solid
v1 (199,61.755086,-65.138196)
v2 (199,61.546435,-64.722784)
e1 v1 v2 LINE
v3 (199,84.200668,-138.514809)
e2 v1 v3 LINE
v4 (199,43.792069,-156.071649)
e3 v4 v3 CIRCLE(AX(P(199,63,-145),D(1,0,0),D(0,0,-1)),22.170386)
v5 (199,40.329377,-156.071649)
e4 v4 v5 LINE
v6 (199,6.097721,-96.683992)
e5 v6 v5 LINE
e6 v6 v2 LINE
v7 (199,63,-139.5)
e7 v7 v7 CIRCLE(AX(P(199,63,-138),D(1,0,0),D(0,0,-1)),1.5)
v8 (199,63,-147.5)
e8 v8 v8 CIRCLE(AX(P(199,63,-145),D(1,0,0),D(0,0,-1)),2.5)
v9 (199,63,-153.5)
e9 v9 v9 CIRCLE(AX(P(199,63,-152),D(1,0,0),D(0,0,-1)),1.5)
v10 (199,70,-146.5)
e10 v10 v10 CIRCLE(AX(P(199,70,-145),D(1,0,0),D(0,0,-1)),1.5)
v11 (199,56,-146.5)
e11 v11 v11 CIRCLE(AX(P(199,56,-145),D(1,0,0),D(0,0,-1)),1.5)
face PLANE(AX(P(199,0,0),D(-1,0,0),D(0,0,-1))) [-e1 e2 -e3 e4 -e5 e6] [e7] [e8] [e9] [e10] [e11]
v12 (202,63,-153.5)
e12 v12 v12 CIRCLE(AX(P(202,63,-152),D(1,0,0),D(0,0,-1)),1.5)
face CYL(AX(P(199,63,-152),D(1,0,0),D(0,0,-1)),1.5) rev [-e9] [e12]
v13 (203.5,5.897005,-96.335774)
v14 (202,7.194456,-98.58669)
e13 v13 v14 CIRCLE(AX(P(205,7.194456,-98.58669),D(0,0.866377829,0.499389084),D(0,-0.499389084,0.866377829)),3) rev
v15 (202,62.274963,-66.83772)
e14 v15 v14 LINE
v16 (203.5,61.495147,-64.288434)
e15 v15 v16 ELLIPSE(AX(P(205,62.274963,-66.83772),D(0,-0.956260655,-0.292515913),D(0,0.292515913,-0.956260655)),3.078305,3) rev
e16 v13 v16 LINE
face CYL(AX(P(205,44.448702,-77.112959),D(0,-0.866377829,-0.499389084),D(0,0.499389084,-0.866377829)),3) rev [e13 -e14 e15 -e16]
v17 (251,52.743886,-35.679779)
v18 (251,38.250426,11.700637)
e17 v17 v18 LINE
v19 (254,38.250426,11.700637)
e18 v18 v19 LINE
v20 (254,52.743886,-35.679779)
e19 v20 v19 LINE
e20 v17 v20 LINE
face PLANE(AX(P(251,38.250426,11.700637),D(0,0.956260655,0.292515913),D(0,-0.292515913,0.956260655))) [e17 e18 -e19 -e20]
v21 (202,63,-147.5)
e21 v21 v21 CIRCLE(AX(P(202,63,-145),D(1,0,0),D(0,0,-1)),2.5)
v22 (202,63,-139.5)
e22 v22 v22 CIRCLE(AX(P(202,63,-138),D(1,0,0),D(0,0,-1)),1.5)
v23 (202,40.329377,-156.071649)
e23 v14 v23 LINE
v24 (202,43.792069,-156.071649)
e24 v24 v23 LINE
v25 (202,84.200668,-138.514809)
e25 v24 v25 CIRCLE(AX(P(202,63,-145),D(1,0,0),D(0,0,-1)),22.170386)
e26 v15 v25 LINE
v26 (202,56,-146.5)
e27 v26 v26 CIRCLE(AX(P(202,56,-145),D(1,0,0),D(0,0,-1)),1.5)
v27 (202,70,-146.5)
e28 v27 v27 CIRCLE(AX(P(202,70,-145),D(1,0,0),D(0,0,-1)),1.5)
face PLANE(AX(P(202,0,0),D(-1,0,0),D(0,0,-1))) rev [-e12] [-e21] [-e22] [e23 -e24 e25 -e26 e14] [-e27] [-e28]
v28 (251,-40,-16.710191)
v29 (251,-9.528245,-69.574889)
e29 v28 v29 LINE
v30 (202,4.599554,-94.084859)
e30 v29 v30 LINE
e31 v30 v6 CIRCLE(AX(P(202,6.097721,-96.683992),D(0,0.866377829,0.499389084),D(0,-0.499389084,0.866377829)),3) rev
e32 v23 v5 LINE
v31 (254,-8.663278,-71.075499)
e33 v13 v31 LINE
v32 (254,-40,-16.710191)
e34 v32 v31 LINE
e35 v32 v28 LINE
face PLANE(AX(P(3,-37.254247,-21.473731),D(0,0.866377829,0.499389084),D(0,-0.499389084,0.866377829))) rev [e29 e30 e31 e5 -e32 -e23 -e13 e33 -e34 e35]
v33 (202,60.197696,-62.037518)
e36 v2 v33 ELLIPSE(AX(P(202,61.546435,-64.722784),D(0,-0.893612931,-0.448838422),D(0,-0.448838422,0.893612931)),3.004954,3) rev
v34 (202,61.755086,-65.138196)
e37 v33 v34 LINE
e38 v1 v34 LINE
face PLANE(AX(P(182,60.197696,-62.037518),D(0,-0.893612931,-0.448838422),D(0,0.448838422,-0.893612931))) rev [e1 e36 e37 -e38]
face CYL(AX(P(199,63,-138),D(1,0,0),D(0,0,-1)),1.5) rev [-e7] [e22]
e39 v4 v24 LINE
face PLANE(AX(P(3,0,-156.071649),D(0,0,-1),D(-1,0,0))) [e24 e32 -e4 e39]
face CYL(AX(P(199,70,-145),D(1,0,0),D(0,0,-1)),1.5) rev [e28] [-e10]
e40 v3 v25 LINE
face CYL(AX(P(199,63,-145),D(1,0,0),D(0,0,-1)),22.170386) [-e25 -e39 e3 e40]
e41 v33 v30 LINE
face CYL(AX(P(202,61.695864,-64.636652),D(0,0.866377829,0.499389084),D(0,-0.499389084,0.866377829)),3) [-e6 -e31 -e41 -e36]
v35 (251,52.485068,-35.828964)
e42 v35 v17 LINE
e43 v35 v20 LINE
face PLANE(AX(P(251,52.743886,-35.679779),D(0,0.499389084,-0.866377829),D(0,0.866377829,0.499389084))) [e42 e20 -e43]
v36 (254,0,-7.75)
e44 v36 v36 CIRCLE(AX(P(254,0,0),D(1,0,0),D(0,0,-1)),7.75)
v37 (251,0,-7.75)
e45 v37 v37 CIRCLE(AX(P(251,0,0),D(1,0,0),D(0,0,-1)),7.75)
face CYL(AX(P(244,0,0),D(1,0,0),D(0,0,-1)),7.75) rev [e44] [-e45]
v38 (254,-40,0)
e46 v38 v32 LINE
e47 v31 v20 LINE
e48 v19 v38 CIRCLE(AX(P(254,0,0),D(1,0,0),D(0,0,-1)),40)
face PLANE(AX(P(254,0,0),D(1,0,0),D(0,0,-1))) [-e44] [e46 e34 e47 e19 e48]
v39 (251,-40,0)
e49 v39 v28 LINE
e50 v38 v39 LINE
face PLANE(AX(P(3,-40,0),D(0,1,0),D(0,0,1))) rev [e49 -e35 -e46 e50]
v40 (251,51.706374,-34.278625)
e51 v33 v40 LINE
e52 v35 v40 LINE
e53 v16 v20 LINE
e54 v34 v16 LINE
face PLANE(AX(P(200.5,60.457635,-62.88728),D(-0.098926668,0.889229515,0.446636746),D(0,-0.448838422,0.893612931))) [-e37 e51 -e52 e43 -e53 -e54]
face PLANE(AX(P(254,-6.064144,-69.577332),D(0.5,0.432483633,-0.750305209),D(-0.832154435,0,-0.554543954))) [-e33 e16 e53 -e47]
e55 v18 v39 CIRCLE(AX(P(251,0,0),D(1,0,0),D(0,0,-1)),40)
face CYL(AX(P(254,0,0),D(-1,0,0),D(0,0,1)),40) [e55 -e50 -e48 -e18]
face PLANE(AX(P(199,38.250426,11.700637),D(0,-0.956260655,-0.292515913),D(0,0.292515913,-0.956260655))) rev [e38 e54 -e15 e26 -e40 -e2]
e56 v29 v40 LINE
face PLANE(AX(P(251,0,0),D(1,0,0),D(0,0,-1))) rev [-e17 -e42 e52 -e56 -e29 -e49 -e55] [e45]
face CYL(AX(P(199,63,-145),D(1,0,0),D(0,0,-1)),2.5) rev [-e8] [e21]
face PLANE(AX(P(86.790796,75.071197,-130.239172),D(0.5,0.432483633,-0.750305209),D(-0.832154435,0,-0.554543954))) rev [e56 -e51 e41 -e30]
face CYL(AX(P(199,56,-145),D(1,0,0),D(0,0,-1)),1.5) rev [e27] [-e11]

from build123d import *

# Parameters (mm, degrees)
SKETCH_2_R           = 3
SKETCH_2_R_2         = 1.5
SKETCH_2_R_3         = 2.5
EXTRUDE_1_DEPTH      = 3
EXTRUDE_2_DEPTH      = 196
SKETCH_5_R           = 8
CUT_EXTRUDE_1_DEPTH  = 10
SKETCH_6_R           = 4.05
CUT_EXTRUDE_2_DEPTH  = 10
SKETCH_8_R           = 40
EXTRUDE_3_DEPTH      = 3
EXTRUDE_START        = -61
EXTRUDE_4_DEPTH      = 64
EXTRUDE_5_DEPTH      = 3
EXTRUDE_START_2      = -3
EXTRUDE_14_DEPTH     = 3
EXTRUDE_15_DEPTH     = 3
SKETCH_16_R          = 40
EXTRUDE_16_DEPTH     = 3
CUT_EXTRUDE_START    = -20
CUT_EXTRUDE_5_DEPTH  = 20
CUT_EXTRUDE_6_DEPTH  = 20
CUT_EXTRUDE_7_DEPTH  = 3
FILLET_3_R           = 3
FILLET_4_R           = 3
FILLET_5_R           = 3
FILLET_6_R           = 3
SKETCH_22_R          = 7.75
CUT_EXTRUDE_8_DEPTH  = 10
SKETCH_23_R          = 4.05
CUT_EXTRUDE_9_DEPTH  = 10
CUT_EXTRUDE_10_DEPTH = 10
CUT_EXTRUDE_11_DEPTH = 10
SKETCH_26_W          = 471.047466431
SKETCH_26_H          = 304.479350924
CUT_EXTRUDE_12_DEPTH = 135


# Some blends are built 0.0001 mm under size
with BuildPart() as part:
    # 草图2 → 凸台-拉伸1 (new body)
    with BuildSketch(Plane(origin=(0, 0, 0), x_dir=(0, 0, -1), z_dir=(1, 0, 0))):
        with BuildLine():
            Line((138.514809283, 84.200667909), (-11.70063651, 38.25042621))
            ThreePointArc((-11.70063651, 38.25042621), (-39.560188627, -5.915359313), (0, -40))
            Line((0, -40), (16.710190716, -40))
            Line((16.710190716, -40), (156.071648789, 40.329376559))
            Line((156.071648789, 40.329376559), (156.071648789, 43.792069046))
            ThreePointArc((156.071648789, 43.792069046), (165.334026038, 71.834783727), (138.514809283, 84.200667909))
        make_face()
        Circle(SKETCH_2_R, mode=Mode.SUBTRACT)
        with Locations((145, 70)):
            Circle(SKETCH_2_R_2, mode=Mode.SUBTRACT)
        with Locations((138, 63)):
            Circle(SKETCH_2_R_2, mode=Mode.SUBTRACT)
        with Locations((145, 56)):
            Circle(SKETCH_2_R_2, mode=Mode.SUBTRACT)
        with Locations((145, 63)):
            Circle(SKETCH_2_R_3, mode=Mode.SUBTRACT)
        with Locations((152, 63)):
            Circle(SKETCH_2_R_2, mode=Mode.SUBTRACT)
    extrude_1 = extrude(amount=EXTRUDE_1_DEPTH)

    # 草图4 → 凸台-拉伸2 (add)
    with BuildSketch(Plane(origin=(3, 0, 0), x_dir=(0, 0, -1), z_dir=(1, 0, 0))):
        with BuildLine():
            Line((0, -40), (16.710190716, -40))
            Line((16.710190716, -40), (156.071648789, 40.329376559))
            Line((156.071648789, 40.329376559), (156.071648789, 43.792069046))
            Line((156.071648789, 43.792069046), (19.975563357, -34.655113166))
            ThreePointArc((19.975563357, -34.655113166), (10.339136167, -38.640681455), (0, -40))
        make_face()
    extrude(amount=EXTRUDE_2_DEPTH)

    # 镜向2: 凸台-拉伸1 across plane
    add(extrude_1.mirror(Plane(origin=(101, 0, 0), x_dir=(0, 0, 1), z_dir=(1, 0, 0))))

    # 草图5 → 切除-拉伸1 (cut)
    with BuildSketch(Plane(origin=(202, 0, 0), x_dir=(0, 0, -1), z_dir=(1, 0, 0))):
        Circle(SKETCH_5_R)
    extrude(amount=-CUT_EXTRUDE_1_DEPTH, mode=Mode.SUBTRACT)

    # 草图6 → 切除-拉伸2 (cut)
    with BuildSketch(Plane.ZY):
        Circle(SKETCH_6_R)
    extrude(amount=-CUT_EXTRUDE_2_DEPTH, mode=Mode.SUBTRACT)

    # 草图9 → 凸台-拉伸4 (add)
    with BuildSketch(Plane(origin=(251, 0, 0), x_dir=(0, 0, -1), z_dir=(1, 0, 0)).offset(EXTRUDE_START)):
        with BuildLine():
            Line((0, -40), (16.710190716, -40))
            Line((16.710190716, -40), (53.747942483, -18.651059269))
            Line((53.747942483, -18.651059269), (52.249775231, -16.051925781))
            Line((52.249775231, -16.051925781), (19.975563357, -34.655113166))
            ThreePointArc((19.975563357, -34.655113166), (10.339136167, -38.640681455), (0, -40))
        make_face()
    extrude_4 = extrude(amount=EXTRUDE_4_DEPTH)

    # 草图10 → 凸台-拉伸5 (add)
    with BuildSketch(Plane(origin=(0, -37.254246654, -21.473730609), x_dir=(1, 0, 0), z_dir=(0, -0.8663778291595938, -0.49938908392225567))):
        Polygon((254, -37.251890328), (254, -57.251890328), (202, -87.274104325), (202, -37.251890328), align=None)
    extrude_5 = extrude(amount=-EXTRUDE_5_DEPTH)



with BuildPart() as body_2:
    # 草图8 → 凸台-拉伸3 (new body)
    with BuildSketch(Plane(origin=(251, 0, 0), x_dir=(0, 0, -1), z_dir=(1, 0, 0))):
        Circle(SKETCH_8_R)
    extrude(amount=EXTRUDE_3_DEPTH)


with BuildPart() as part_1:
    add(part.part)

    add(body_2.part)  # 凸台-拉伸14 merges body 2
    # 草图14 → 凸台-拉伸14 (add)
    with BuildSketch(Plane(origin=(254, 0, 0), x_dir=(0, 0, -1), z_dir=(1, 0, 0)).offset(EXTRUDE_START_2)):
        with BuildLine():
            Line((-11.70063651, 38.25042621), (35.679778873, 52.743886101))
            Line((35.679778873, 52.743886101), (69.577331814, -6.064144103))
            Line((69.577331814, -6.064144103), (19.975563357, -34.655113166))
            ThreePointArc((19.975563357, -34.655113166), (36.686823541, 15.939792297), (-11.70063651, 38.25042621))
        make_face()
    extrude_14 = extrude(amount=EXTRUDE_14_DEPTH)

    # 草图15 → 凸台-拉伸15 (add)
    with BuildSketch(Plane(origin=(88.290795719, 76.368648195, -132.490087928), x_dir=(-0.8660254037844362, 0.24969454196113006, -0.43318891457980085), z_dir=(0.5000000000000046, 0.43248363304931103, -0.7503052093278205))):
        Polygon((-191.344507397, -43), (-191.344507397, 27.878041456), (-131.300079402, 20.97393325), (-131.300079402, -43), align=None)
    extrude_15 = extrude(amount=-EXTRUDE_15_DEPTH)

    # 镜向8: 凸台-拉伸15 across plane
    add(extrude_15.mirror(Plane(origin=(101, 0, 0), x_dir=(0, 0, 1), z_dir=(1, 0, 0))))

    # 镜向10: 凸台-拉伸5 across plane
    add(extrude_5.mirror(Plane(origin=(101, 0, 0), x_dir=(0, 0, 1), z_dir=(1, 0, 0))))

    # 镜向11: 凸台-拉伸4 across plane
    add(extrude_4.mirror(Plane(origin=(101, 0, 0), x_dir=(0, 0, 1), z_dir=(1, 0, 0))))

    # 镜向12: 凸台-拉伸14 across plane
    add(extrude_14.mirror(Plane(origin=(101, 0, 0), x_dir=(0, 0, 1), z_dir=(1, 0, 0))))

    # 草图16 → 凸台-拉伸16 (add)
    with BuildSketch(Plane.ZY.offset(52)):
        Circle(SKETCH_16_R)
    extrude(amount=-EXTRUDE_16_DEPTH)

    # 草图17 → 切除-拉伸5 (cut)
    with BuildSketch(Plane(origin=(202, 0, 0), x_dir=(0, 0, -1), z_dir=(1, 0, 0)).offset(CUT_EXTRUDE_START)):
        with BuildLine():
            Line((-11.120326036, 38.423148607), (61.739147636, 60.715331959))
            Line((61.739147636, 60.715331959), (65.138195736, 61.755085767))
            Line((65.138195736, 61.755085767), (62.037518083, 60.197696416))
            Line((62.037518083, 60.197696416), (92.586691567, 7.198687311))
            Line((92.586691567, 7.198687311), (19.975563357, -34.655113166))
            ThreePointArc((19.975563357, -34.655113166), (-36.806411031, -15.66167638), (-11.120326036, 38.423148607))
        make_face()
    extrude(amount=CUT_EXTRUDE_5_DEPTH, mode=Mode.SUBTRACT)


with BuildPart() as cut_extrude_5_piece_1:
    # of the separate pieces the step leaves, piece 1, a body of its own (cut_extrude_5_pieces)
    add(part_1.part.solids().sort_by_distance((0, 43.792069046, -156.071648789))[0])

    # 草图21 → 切除-拉伸7 (cut)
    with BuildSketch(Plane(origin=(3, 0, 0), x_dir=(0, 0, -1), z_dir=(1, 0, 0))):
        with BuildLine():
            Line((92.586691567, 7.198687311), (62.037518083, 60.197696416))
            Line((62.037518083, 60.197696416), (65.138195736, 61.755085767))
            Line((65.138195736, 61.755085767), (61.739147636, 60.715331959))
            Line((61.739147636, 60.715331959), (-11.70063651, 38.25042621))
            ThreePointArc((-11.70063651, 38.25042621), (-36.686823541, -15.939792297), (19.975563357, -34.655113166))
            Line((19.975563357, -34.655113166), (92.586691567, 7.198687311))
        make_face()
    extrude(amount=-CUT_EXTRUDE_7_DEPTH, mode=Mode.SUBTRACT)

    # 圆角3
    fillet_3_edges = [cut_extrude_5_piece_1.edges().sort_by_distance(p)[0] for p in [
        (3, 33.698191863, -77.312104825),
    ]]
    fillet(fillet_3_edges, radius=FILLET_3_R - 0.0001)  # a hair under: the kernel refuses the full size

    # 圆角4
    fillet_4_edges = [cut_extrude_5_piece_1.edges().sort_by_distance(p)[0] for p in [
        (199, 33.698191863, -77.312104825),
    ]]
    fillet(fillet_4_edges, radius=FILLET_4_R - 0.0001)  # a hair under: the kernel refuses the full size

    # 圆角5
    # the kernel refuses this fillet: 3 mm, written as the material it adds along each edge
    with BuildSketch(Plane(origin=(202, 65.506611814, -62.97577757), x_dir=(0, 0.49938908392225567, -0.8663778291595938), z_dir=(0, -0.8663778291595938, -0.49938908392225567))) as fillet_5_piece_1_section:
        with BuildLine():
            CenterArc((FILLET_5_R * 0.57735026919, FILLET_5_R), FILLET_5_R, 210, 60)
            Line((-FILLET_5_R * 0.288675134595, FILLET_5_R * 0.5), (0, 0))
            Line((0, 0), (FILLET_5_R * 0.57735026919, 0))
        make_face()
    fillet_5_piece_1 = extrude(amount=68.304060269, mode=Mode.PRIVATE)
    fillet_5_piece_1 = split(fillet_5_piece_1, bisect_by=Plane(origin=(202.325553984, 63.906694987, -72.171998522), z_dir=(0, -0.9562606552534866, -0.2925159127537726)), keep=Keep.TOP, mode=Mode.PRIVATE)
    fillet_5_piece_1 = split(fillet_5_piece_1, bisect_by=Plane(origin=(199.177617764, 62.412552566, -67.072312804), z_dir=(0.09892666816624703, -0.8892295154916122, -0.446636746253684)), keep=Keep.TOP, mode=Mode.PRIVATE)
    add(fillet_5_piece_1)

    # 圆角6
    # the kernel refuses this fillet: 3 mm, written as the material it adds along each edge
    with BuildSketch(Plane(origin=(0, 6.329488355, -97.086079656), x_dir=(0, 0.49938908392225556, -0.8663778291595938), z_dir=(0, 0.8663778291595938, 0.4993890839222556))) as fillet_6_piece_1_section:
        with BuildLine():
            CenterArc((FILLET_6_R * 0.57735026919, FILLET_6_R), FILLET_6_R, 210, 60)
            Line((-FILLET_6_R * 0.288675134595, FILLET_6_R * 0.5), (0, 0))
            Line((0, 0), (FILLET_6_R * 0.57735026919, 0))
        make_face()
    fillet_6_piece_1 = extrude(amount=68.304060269, mode=Mode.PRIVATE)
    fillet_6_piece_1 = split(fillet_6_piece_1, bisect_by=Plane(origin=(-0.325553984, 63.906694987, -72.171998522), z_dir=(0, -0.9562606552534866, -0.2925159127537726)), keep=Keep.TOP, mode=Mode.PRIVATE)
    fillet_6_piece_1 = split(fillet_6_piece_1, bisect_by=Plane(origin=(2.822382236, 62.412552566, -67.072312804), z_dir=(-0.09892666816624703, -0.8892295154916122, -0.446636746253684)), keep=Keep.TOP, mode=Mode.PRIVATE)
    add(fillet_6_piece_1)

    # 草图22 → 切除-拉伸8 (cut)
    with BuildSketch(Plane(origin=(254, 0, 0), x_dir=(0, 0, -1), z_dir=(1, 0, 0))):
        Circle(SKETCH_22_R)
    extrude(amount=-CUT_EXTRUDE_8_DEPTH, mode=Mode.SUBTRACT)

    # 草图23 → 切除-拉伸9 (cut)
    with BuildSketch(Plane.ZY.offset(52)):
        Circle(SKETCH_23_R)
    extrude(amount=-CUT_EXTRUDE_9_DEPTH, mode=Mode.SUBTRACT)

    # 草图24 → 切除-拉伸10 (cut)
    with BuildSketch(Plane(origin=(0, -34.655113166, -19.975563357), x_dir=(1, 0, 0), z_dir=(0, 0.8663778291595939, 0.4993890839222556))):
        with BuildLine():
            Line((3, 179.256683584), (3, 86.81000271))
            ThreePointArc((3, 86.81000271), (2.121320344, 84.688682367), (0, 83.81000271))
            Line((0, 83.81000271), (-49, 55.51983952))
            Line((-49, 55.51983952), (-49, -19.975563357))
            Line((-49, -19.975563357), (251, -19.975563357))
            Line((251, -19.975563357), (251, 55.51983952))
            Line((251, 55.51983952), (202, 83.81000271))
            ThreePointArc((202, 83.81000271), (199.878679656, 84.688682367), (199, 86.81000271))
            Line((199, 86.81000271), (199, 179.256683584))
            Line((199, 179.256683584), (3, 179.256683584))
        make_face()
    extrude(amount=-CUT_EXTRUDE_10_DEPTH, mode=Mode.SUBTRACT)

    # 草图25 → 切除-拉伸11 (cut)
    with BuildSketch(Plane.XZ.offset(40)):
        Polygon((-49, 40), (-49, -27.969882149), (251, -27.969882149), (251, 42.699584458), align=None)
    extrude(amount=-CUT_EXTRUDE_11_DEPTH, mode=Mode.SUBTRACT)


with BuildPart() as cut_extrude_5_piece_2:
    # of the separate pieces the step leaves, piece 2, a body of its own (cut_extrude_5_pieces)
    add(part_1.part.solids().sort_by_distance((202, 60.715331959, -61.739147636))[0])

    # 草图18 → 切除-拉伸6 (cut)
    with BuildSketch(Plane(origin=(0, 38.25042621, 11.70063651), x_dir=(1, 0, 0), z_dir=(0, 0.9562606552534866, 0.2925159127537726))):
        Polygon((199, 76.798918519), (202, 76.932821805), (202, 0), (199, 0), align=None)
    extrude(amount=-CUT_EXTRUDE_6_DEPTH, mode=Mode.SUBTRACT)


with BuildPart() as cut_extrude_11_piece_1:
    # of the separate pieces the step leaves, piece 1, a body of its own (cut_extrude_11_pieces)
    add(cut_extrude_5_piece_1.part.solids().sort_by_distance((-1.5, 5.897004722, -96.335774447))[0])

    # 草图26 → 切除-拉伸12 (cut)
    with BuildSketch(Plane(origin=(3, 0, 0), x_dir=(0, 0, -1), z_dir=(1, 0, 0))):
        with Locations((179.814409689, 100.362016139)):
            Rectangle(SKETCH_26_W, SKETCH_26_H)
    extrude(amount=-CUT_EXTRUDE_12_DEPTH, mode=Mode.SUBTRACT)


with BuildPart() as cut_extrude_11_piece_2:
    # of the separate pieces the step leaves, piece 2, a body of its own (cut_extrude_11_pieces)
    add(cut_extrude_5_piece_1.part.solids().sort_by_distance((251, -40, 0))[0])


solid = cut_extrude_11_piece_2.part
